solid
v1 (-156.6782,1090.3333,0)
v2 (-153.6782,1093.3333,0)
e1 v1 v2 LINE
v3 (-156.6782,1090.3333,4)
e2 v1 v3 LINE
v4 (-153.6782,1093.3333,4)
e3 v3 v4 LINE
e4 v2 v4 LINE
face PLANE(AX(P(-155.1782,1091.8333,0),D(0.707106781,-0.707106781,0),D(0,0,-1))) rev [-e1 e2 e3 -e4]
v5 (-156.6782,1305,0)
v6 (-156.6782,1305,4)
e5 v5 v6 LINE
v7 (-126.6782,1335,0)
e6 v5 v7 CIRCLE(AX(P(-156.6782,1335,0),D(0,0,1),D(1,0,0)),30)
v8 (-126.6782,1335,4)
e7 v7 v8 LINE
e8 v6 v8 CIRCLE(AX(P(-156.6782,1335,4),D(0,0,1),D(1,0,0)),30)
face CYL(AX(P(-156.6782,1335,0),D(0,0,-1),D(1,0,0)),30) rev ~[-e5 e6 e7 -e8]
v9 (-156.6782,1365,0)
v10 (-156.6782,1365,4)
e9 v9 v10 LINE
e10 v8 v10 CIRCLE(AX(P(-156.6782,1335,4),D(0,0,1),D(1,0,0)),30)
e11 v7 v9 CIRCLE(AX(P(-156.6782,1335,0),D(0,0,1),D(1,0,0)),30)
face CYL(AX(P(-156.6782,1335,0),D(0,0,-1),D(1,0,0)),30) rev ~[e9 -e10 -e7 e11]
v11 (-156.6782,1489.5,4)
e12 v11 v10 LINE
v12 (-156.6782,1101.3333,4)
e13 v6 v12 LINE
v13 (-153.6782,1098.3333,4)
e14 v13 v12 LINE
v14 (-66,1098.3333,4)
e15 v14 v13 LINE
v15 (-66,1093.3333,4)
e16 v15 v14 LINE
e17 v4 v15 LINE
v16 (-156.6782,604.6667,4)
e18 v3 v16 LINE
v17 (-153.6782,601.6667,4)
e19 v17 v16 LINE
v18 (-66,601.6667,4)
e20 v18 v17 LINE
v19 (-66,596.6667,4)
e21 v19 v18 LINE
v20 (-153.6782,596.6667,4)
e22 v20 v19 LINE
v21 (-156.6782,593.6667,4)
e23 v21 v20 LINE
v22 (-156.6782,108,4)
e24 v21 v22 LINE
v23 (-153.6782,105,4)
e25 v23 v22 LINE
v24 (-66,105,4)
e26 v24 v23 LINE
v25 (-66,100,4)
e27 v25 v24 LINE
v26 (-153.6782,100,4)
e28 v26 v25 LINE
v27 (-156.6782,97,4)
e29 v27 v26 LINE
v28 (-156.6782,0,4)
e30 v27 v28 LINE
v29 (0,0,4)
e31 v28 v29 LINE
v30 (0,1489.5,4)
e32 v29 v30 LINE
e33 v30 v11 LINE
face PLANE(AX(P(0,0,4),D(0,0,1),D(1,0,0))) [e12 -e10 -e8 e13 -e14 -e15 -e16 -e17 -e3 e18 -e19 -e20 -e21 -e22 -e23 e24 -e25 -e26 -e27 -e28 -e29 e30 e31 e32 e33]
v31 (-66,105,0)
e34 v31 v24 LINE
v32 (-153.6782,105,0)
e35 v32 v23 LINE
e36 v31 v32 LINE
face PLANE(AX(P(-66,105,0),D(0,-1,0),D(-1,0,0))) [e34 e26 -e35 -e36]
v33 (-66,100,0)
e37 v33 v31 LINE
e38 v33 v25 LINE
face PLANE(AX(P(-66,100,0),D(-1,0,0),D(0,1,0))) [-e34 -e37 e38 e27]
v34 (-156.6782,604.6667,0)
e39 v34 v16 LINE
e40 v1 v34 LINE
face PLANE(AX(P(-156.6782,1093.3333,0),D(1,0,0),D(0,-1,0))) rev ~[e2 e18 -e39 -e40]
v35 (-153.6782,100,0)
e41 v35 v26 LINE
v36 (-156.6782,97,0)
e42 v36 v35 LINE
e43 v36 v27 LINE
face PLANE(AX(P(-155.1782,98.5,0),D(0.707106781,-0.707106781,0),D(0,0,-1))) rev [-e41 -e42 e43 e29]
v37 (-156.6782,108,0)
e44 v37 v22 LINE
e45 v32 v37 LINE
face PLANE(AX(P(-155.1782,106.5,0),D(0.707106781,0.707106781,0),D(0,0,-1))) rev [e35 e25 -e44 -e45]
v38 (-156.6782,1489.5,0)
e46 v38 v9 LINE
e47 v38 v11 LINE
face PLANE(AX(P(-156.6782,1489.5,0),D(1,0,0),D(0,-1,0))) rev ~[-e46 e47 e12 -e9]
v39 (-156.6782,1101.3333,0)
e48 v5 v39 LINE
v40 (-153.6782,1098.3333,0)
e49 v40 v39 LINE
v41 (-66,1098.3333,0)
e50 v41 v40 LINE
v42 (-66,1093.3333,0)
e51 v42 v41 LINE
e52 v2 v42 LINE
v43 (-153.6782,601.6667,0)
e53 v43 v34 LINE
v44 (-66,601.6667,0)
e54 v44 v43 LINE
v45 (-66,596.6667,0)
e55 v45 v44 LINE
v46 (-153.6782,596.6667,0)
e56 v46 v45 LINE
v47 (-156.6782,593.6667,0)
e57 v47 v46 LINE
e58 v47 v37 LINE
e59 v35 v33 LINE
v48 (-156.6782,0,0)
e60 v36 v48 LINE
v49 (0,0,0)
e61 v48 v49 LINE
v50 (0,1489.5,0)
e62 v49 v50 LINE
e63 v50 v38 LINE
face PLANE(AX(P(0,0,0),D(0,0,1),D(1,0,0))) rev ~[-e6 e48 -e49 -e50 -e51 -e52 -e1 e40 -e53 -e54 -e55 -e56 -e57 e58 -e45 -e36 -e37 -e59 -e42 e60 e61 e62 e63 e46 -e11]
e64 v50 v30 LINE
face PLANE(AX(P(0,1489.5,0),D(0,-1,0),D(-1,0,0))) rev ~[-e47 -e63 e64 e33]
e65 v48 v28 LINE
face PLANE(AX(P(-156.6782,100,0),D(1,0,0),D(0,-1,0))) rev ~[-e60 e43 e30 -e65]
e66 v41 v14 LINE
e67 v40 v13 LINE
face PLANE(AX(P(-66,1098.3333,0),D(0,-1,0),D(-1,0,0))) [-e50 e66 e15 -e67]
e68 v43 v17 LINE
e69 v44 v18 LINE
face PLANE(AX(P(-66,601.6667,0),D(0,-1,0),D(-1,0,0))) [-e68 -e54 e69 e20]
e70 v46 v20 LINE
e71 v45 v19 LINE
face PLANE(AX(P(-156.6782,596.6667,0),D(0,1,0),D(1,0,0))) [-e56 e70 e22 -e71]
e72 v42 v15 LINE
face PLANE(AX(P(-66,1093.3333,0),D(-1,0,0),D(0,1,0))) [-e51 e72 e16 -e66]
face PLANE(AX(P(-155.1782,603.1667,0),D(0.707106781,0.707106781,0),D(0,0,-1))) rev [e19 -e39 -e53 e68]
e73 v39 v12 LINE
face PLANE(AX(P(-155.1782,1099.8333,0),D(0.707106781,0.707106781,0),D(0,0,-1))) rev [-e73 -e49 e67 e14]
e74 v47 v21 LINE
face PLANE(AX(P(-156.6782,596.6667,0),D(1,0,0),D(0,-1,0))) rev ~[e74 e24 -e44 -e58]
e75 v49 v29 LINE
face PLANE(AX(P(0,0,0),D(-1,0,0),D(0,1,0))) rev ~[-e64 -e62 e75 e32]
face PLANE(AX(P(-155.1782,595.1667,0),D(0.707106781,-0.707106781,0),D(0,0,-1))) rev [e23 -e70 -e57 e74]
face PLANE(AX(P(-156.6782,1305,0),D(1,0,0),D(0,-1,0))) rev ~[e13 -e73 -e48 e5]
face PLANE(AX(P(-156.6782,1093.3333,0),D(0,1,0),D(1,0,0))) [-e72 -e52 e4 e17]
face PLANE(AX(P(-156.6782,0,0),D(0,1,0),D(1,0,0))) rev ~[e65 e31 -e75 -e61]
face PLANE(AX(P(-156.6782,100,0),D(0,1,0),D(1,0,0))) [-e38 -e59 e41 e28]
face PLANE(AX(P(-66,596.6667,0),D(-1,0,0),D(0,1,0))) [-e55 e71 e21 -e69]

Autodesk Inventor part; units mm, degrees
ref_plane "YZ Plane" through (0, 0, 0) normal (1, 0, 0) x (0, 1, 0)
ref_plane "XZ Plane" through (0, 0, 0) normal (0, 1, 0) x (-1, 0, 0)
ref_plane "XY Plane" through (0, 0, 0) normal (0, 0, 1) x (1, 0, 0)
sketch "Sketch1" plane through (0, 0, 0) normal (0, 0, 1) x (1, 0, 0)
  line L0 (0, 1489.5) -> (-156.6782, 1489.5)
  line L1 (-156.6782, 1489.5) -> (-156.6782, 0)
  line L2 (-156.6782, 0) -> (0, 0)
  line L3 (0, 0) -> (0, 1489.5)
  line L4 (-156.6782, 100) -> (-66, 100)
  line L5 (-66, 100) -> (-66, 105)
  line L6 (-66, 105) -> (-156.6782, 105)
  line L7 (-156.6782, 105) -> (-156.6782, 100)
  line L8 (-156.6782, 596.6667) -> (-66, 596.6667)
  line L9 (-66, 596.6667) -> (-66, 601.6667)
  line L10 (-66, 601.6667) -> (-156.6782, 601.6667)
  line L11 (-156.6782, 601.6667) -> (-156.6782, 596.6667)
  line L12 (-156.6782, 1093.3333) -> (-66, 1093.3333)
  line L13 (-66, 1093.3333) -> (-66, 1098.3333)
  line L14 (-66, 1098.3333) -> (-156.6782, 1098.3333)
  line L15 (-156.6782, 1098.3333) -> (-156.6782, 1093.3333)
  circle A0 centre (-156.6782, 1335) radius 30
  point P0 (-156.6782, 1098.3333)
  point P1 (-156.6782, 1093.3333)
  point P2 (-156.6782, 105)
  point P3 (-156.6782, 1365)
  point P4 (-156.6782, 1305)
  dimension "d0" = 1489.5
  dimension "d1" = 156.6782
  dimension "d2" = 5
  dimension "d4" = 100
  dimension "d7" = 496.6667
  dimension "d23" = 66
  dimension "d29" = 60
  dimension "d30" = 1335
extrude "Plate1" add sketch "Sketch1" along normal blind 4 contours L3 L2 L1 L4 L5 L6 L8 L9 L10 L12 L13 L14 A0 L0
chamfer "Corner Chamfer1" distance 3 angle 45 6 edges at (-156.6782, 100, 2) (-156.6782, 105, 2) (-156.6782, 596.6667, 2) (-156.6782, 601.6667, 2) (-156.6782, 1098.3333, 2) (-156.6782, 1093.3333, 2)
equation "\"d0\" = Стрингер_длина"
equation "\"d1\" = стрингер_глубина_4"
equation "\"d2\" = паз_под_стрингер_толщина"
equation "\"d7\" = Шаг_шпангоутов"
equation "\"d23\" = паз_под_стрингер_глубина - Thickness"
equation "\"d29\" = 2 * радиус_выреза_под_сварку"
equation "\"d12\" = Thickness"
equation "\"BendRadius\" = Thickness"
equation "\"BendReliefWidth\" = Thickness"
equation "\"BendReliefDepth\" = 0.5 * Thickness"
equation "\"CornerReliefSize\" = 4 * Thickness"
equation "\"MinimumRemnant\" = 2 * Thickness"
equation "\"TransitionRadius\" = BendRadius"
equation "\"JacobiRadiusSize\" = BendRadius"
equation "\"GapSize\" = Thickness"
equation "\"Стрингер_длина\" = 1489.5"
equation "\"стрингер_глубина_4\" = 156.678203"
equation "\"паз_под_стрингер_толщина\" = 5"
equation "\"Шаг_шпангоутов\" = 496.666667"
equation "\"паз_под_стрингер_глубина\" = 70"
equation "\"Thickness\" = 4"
equation "\"радиус_выреза_под_сварку\" = 30"
properties part number "GBK 3217 stringer 4" material "Steel"
